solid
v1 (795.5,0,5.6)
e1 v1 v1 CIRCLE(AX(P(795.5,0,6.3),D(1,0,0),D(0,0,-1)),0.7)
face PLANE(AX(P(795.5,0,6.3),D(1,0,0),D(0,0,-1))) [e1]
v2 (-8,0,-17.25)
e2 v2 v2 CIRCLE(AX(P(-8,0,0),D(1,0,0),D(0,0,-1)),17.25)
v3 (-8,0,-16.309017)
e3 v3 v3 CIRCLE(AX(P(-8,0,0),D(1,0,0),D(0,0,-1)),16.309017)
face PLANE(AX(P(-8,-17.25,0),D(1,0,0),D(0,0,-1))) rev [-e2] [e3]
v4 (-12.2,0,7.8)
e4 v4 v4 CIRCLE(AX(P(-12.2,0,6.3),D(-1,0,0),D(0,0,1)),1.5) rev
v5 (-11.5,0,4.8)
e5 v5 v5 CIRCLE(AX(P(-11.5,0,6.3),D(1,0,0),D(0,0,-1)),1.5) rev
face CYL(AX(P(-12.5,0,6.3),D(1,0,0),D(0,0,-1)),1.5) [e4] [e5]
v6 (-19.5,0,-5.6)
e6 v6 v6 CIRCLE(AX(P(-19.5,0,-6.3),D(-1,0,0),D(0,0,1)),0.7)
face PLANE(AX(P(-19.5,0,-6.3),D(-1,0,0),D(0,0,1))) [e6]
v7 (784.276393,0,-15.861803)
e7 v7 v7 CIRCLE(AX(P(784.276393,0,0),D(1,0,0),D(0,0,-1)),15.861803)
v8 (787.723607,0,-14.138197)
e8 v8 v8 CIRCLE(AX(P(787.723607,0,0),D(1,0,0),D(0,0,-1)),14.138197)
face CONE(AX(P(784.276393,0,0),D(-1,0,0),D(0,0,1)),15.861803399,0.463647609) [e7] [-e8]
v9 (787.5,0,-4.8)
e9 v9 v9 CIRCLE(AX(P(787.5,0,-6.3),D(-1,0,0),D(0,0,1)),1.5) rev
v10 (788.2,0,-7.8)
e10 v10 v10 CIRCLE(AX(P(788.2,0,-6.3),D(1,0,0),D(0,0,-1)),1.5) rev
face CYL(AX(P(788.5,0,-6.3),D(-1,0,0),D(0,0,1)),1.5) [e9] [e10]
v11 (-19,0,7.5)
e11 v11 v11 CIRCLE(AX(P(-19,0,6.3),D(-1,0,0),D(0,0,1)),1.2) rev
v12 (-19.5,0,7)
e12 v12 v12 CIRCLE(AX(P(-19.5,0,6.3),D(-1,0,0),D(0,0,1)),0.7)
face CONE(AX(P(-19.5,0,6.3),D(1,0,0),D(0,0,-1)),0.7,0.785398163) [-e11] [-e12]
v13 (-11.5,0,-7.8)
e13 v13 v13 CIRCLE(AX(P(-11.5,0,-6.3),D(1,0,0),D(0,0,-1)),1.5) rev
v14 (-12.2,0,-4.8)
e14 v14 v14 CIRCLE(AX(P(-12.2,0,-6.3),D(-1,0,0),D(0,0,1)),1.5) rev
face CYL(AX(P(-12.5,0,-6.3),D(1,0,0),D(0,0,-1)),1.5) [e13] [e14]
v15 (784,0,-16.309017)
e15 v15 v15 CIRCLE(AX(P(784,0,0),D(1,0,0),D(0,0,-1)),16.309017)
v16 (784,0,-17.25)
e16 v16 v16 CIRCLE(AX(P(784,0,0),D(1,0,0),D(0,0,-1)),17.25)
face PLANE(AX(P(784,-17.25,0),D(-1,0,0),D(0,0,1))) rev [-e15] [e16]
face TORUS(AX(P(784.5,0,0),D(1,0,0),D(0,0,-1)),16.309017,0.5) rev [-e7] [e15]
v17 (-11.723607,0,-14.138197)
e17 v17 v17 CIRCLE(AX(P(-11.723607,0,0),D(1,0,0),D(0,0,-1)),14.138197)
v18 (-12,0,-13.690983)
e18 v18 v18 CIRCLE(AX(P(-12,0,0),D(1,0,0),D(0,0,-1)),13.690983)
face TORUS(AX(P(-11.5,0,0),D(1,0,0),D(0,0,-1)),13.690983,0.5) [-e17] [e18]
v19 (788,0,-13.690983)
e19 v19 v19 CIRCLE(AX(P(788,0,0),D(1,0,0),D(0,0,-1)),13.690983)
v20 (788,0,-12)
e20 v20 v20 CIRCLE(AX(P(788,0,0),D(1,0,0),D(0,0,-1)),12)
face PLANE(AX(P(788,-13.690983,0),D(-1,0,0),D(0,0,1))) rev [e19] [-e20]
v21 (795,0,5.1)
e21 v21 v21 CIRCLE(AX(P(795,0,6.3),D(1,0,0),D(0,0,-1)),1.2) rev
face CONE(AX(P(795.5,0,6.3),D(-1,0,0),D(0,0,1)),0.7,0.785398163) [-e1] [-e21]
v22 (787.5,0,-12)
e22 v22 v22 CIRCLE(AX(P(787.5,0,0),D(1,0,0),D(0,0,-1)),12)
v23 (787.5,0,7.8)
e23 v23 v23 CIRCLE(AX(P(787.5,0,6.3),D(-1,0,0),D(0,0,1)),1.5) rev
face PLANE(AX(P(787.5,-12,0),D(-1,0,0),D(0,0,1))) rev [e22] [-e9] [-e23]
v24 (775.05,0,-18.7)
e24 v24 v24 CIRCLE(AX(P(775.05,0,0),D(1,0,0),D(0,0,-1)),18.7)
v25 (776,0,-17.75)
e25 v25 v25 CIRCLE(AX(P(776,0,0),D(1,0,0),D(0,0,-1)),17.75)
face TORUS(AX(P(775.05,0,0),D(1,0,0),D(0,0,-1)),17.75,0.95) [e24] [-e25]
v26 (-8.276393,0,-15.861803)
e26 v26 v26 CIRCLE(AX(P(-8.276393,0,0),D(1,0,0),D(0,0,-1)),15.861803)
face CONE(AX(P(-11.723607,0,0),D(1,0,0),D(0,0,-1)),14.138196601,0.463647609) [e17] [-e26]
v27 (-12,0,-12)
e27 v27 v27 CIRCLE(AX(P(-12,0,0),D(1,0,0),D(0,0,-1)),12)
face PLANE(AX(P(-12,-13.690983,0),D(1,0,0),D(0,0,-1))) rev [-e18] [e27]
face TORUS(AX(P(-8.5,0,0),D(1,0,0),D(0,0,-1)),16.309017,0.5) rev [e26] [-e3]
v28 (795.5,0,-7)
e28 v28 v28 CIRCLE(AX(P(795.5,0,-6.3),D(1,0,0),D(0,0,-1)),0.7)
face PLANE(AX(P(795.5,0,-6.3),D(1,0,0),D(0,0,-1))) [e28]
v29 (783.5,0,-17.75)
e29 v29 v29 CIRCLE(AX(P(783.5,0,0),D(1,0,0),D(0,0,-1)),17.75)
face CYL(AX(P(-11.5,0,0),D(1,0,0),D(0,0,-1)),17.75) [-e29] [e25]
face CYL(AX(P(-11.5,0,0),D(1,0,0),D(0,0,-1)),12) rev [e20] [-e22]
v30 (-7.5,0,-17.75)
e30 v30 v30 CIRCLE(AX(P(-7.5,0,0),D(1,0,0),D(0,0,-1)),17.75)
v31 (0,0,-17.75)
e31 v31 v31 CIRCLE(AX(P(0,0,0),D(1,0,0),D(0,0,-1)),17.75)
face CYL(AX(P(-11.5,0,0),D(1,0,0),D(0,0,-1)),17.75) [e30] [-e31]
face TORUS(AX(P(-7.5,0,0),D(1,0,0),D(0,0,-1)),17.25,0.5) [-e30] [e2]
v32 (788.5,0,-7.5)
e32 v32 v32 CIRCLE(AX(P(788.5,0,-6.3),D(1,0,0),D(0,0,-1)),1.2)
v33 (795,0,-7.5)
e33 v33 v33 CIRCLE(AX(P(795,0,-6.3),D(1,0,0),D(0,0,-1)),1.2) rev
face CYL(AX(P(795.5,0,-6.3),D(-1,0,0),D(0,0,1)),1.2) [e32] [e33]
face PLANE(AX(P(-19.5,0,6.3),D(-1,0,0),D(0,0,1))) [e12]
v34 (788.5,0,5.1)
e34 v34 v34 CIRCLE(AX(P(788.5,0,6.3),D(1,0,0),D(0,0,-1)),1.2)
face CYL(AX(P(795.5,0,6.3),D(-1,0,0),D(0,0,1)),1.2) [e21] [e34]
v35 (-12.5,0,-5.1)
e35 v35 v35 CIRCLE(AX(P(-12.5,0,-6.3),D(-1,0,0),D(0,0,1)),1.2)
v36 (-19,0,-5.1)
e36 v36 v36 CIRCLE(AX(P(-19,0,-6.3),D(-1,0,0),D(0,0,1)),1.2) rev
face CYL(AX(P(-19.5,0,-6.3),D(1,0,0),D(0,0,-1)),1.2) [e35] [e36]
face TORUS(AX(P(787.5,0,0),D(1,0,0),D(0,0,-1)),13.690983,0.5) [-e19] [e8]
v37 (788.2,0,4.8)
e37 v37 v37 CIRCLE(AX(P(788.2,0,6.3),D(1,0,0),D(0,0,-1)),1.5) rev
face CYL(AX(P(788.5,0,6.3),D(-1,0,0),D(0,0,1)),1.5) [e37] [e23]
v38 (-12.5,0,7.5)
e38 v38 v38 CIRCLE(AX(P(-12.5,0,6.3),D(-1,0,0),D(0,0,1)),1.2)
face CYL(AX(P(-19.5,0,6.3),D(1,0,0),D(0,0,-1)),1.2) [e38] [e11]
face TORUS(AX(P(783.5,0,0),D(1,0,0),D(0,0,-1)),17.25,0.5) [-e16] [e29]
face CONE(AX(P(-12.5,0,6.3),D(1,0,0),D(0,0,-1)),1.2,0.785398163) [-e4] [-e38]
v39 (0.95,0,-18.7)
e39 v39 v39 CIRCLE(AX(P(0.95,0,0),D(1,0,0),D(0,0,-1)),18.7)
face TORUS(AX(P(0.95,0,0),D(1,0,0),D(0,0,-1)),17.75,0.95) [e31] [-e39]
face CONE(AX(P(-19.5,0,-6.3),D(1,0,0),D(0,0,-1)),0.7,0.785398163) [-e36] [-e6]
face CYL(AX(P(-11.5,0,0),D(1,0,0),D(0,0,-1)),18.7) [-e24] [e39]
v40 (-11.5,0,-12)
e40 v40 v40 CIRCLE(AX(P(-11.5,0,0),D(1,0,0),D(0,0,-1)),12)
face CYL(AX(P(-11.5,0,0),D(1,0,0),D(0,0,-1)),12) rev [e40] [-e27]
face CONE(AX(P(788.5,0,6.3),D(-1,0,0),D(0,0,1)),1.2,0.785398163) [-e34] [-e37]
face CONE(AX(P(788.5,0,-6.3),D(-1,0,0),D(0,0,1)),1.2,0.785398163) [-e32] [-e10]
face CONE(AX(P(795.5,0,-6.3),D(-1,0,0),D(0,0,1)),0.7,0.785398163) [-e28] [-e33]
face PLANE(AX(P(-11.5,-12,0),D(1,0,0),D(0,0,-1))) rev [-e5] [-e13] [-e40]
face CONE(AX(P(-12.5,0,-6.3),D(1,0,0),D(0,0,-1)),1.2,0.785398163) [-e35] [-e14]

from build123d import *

# Parameters (mm, degrees)
SKETCH2_R      = 1.2
EXTRUDE1_DEPTH = 8
SKETCH3_R      = 1.5
EXTRUDE2_DEPTH = 1
EXTRUDE3_START = 8
SKETCH4_R      = 1.2
EXTRUDE3_DEPTH = 8
EXTRUDE4_START = 1
SKETCH5_R      = 1.5
EXTRUDE4_DEPTH = 1
CHAMFER1_SIZE  = 0.3
CHAMFER2_SIZE  = 0.5


with BuildPart() as part:
    # Sketch1 → Revolve1 (revolve)
    with BuildSketch(Plane.XY, mode=Mode.PRIVATE) as revolve1_sk:
        with BuildLine():
            Line((0, -17.75), (-7.5, -17.75))
            ThreePointArc((-7.5, -17.75), (-7.853553391, -17.603553391), (-8, -17.25))
            Line((-8, -17.25), (-8, -16.309016994))
            ThreePointArc((-8, -16.309016994), (-8.074674596, -16.046151438), (-8.276393202, -15.861803399))
            Line((-8.276393202, -15.861803399), (-11.723606798, -14.138196601))
            ThreePointArc((-11.723606798, -14.138196601), (-11.925325404, -13.953848562), (-12, -13.690983006))
            Line((-12, -13.690983006), (-12, -12))
            Line((-12, -12), (-11.5, -12))
            Line((-11.5, -12), (-11.5, 0))
            Line((-11.5, 0), (0, 0))
            Line((0, 0), (776, 0))
            Line((776, 0), (787.5, 0))
            Line((787.5, 0), (787.5, -12))
            Line((787.5, -12), (788, -12))
            Line((788, -12), (788, -13.690983006))
            ThreePointArc((788, -13.690983006), (787.925325404, -13.953848562), (787.723606798, -14.138196601))
            Line((787.723606798, -14.138196601), (784.276393202, -15.861803399))
            ThreePointArc((784.276393202, -15.861803399), (784.074674596, -16.046151438), (784, -16.309016994))
            Line((784, -16.309016994), (784, -17.25))
            ThreePointArc((784, -17.25), (783.853553391, -17.603553391), (783.5, -17.75))
            Line((783.5, -17.75), (776, -17.75))
            ThreePointArc((776, -17.75), (775.721751442, -18.421751442), (775.05, -18.7))
            Line((775.05, -18.7), (0.95, -18.7))
            ThreePointArc((0.95, -18.7), (0.278248558, -18.421751442), (0, -17.75))
        make_face()
    revolve(revolve1_sk.sketch.rotate(Axis((-11.5, 0, 0), (-1, 0, 0)), 270), axis=Axis((-11.5, 0, 0), (-1, 0, 0)))

    # Sketch2 → Extrude1 (add)
    with BuildSketch(Plane.ZY.offset(11.5)):
        with Locations(Location((-6.3, 0, 0), (0, 0, 180))):
            Circle(SKETCH2_R)
        with Locations(Location((6.3, 0, 0), (0, 0, 180))):
            Circle(SKETCH2_R)
    extrude(amount=EXTRUDE1_DEPTH)

    # Sketch3 → Extrude2 (add)
    with BuildSketch(Plane.ZY.offset(11.5)):
        with Locations(Location((-6.3, 0, 0), (0, 0, 180))):
            Circle(SKETCH3_R)
        with Locations(Location((6.3, 0, 0), (0, 0, 180))):
            Circle(SKETCH3_R)
    extrude(amount=EXTRUDE2_DEPTH)

    # Sketch4 → Extrude3 (add)
    with BuildSketch(Plane(origin=(787.5, 0, 0), x_dir=(0, 0, -1), z_dir=(1, 0, 0)).offset(EXTRUDE3_START)):
        with Locations(Location((6.3, 0, 0), (0, 0, 180))):
            Circle(SKETCH4_R)
        with Locations(Location((-6.3, 0, 0), (0, 0, 180))):
            Circle(SKETCH4_R)
    extrude(amount=-EXTRUDE3_DEPTH)

    # Sketch5 → Extrude4 (add)
    with BuildSketch(Plane(origin=(787.5, 0, 0), x_dir=(0, 0, -1), z_dir=(1, 0, 0)).offset(EXTRUDE4_START)):
        with Locations((6.3, 0)):
            Circle(SKETCH5_R)
        with Locations((-6.3, 0)):
            Circle(SKETCH5_R)
    extrude(amount=-EXTRUDE4_DEPTH)

    # Chamfer1
    chamfer1_edges = [part.edges().sort_by_distance(p)[0] for p in [
        (-12.5, 0, -4.8),
        (-12.5, 0, 7.8),
        (788.5, 0, -4.8),
        (788.5, 0, 7.8),
    ]]
    chamfer(chamfer1_edges, length=CHAMFER1_SIZE - 0.0001)  # a hair under: the kernel refuses the full size

    # Chamfer2
    chamfer2_edges = [part.edges().sort_by_distance(p)[0] for p in [
        (-19.5, 0, -5.1),
        (-19.5, 0, 7.5),
        (795.5, 0, -7.5),
        (795.5, 0, 5.1),
    ]]
    chamfer(chamfer2_edges, length=CHAMFER2_SIZE)


solid = part.part
